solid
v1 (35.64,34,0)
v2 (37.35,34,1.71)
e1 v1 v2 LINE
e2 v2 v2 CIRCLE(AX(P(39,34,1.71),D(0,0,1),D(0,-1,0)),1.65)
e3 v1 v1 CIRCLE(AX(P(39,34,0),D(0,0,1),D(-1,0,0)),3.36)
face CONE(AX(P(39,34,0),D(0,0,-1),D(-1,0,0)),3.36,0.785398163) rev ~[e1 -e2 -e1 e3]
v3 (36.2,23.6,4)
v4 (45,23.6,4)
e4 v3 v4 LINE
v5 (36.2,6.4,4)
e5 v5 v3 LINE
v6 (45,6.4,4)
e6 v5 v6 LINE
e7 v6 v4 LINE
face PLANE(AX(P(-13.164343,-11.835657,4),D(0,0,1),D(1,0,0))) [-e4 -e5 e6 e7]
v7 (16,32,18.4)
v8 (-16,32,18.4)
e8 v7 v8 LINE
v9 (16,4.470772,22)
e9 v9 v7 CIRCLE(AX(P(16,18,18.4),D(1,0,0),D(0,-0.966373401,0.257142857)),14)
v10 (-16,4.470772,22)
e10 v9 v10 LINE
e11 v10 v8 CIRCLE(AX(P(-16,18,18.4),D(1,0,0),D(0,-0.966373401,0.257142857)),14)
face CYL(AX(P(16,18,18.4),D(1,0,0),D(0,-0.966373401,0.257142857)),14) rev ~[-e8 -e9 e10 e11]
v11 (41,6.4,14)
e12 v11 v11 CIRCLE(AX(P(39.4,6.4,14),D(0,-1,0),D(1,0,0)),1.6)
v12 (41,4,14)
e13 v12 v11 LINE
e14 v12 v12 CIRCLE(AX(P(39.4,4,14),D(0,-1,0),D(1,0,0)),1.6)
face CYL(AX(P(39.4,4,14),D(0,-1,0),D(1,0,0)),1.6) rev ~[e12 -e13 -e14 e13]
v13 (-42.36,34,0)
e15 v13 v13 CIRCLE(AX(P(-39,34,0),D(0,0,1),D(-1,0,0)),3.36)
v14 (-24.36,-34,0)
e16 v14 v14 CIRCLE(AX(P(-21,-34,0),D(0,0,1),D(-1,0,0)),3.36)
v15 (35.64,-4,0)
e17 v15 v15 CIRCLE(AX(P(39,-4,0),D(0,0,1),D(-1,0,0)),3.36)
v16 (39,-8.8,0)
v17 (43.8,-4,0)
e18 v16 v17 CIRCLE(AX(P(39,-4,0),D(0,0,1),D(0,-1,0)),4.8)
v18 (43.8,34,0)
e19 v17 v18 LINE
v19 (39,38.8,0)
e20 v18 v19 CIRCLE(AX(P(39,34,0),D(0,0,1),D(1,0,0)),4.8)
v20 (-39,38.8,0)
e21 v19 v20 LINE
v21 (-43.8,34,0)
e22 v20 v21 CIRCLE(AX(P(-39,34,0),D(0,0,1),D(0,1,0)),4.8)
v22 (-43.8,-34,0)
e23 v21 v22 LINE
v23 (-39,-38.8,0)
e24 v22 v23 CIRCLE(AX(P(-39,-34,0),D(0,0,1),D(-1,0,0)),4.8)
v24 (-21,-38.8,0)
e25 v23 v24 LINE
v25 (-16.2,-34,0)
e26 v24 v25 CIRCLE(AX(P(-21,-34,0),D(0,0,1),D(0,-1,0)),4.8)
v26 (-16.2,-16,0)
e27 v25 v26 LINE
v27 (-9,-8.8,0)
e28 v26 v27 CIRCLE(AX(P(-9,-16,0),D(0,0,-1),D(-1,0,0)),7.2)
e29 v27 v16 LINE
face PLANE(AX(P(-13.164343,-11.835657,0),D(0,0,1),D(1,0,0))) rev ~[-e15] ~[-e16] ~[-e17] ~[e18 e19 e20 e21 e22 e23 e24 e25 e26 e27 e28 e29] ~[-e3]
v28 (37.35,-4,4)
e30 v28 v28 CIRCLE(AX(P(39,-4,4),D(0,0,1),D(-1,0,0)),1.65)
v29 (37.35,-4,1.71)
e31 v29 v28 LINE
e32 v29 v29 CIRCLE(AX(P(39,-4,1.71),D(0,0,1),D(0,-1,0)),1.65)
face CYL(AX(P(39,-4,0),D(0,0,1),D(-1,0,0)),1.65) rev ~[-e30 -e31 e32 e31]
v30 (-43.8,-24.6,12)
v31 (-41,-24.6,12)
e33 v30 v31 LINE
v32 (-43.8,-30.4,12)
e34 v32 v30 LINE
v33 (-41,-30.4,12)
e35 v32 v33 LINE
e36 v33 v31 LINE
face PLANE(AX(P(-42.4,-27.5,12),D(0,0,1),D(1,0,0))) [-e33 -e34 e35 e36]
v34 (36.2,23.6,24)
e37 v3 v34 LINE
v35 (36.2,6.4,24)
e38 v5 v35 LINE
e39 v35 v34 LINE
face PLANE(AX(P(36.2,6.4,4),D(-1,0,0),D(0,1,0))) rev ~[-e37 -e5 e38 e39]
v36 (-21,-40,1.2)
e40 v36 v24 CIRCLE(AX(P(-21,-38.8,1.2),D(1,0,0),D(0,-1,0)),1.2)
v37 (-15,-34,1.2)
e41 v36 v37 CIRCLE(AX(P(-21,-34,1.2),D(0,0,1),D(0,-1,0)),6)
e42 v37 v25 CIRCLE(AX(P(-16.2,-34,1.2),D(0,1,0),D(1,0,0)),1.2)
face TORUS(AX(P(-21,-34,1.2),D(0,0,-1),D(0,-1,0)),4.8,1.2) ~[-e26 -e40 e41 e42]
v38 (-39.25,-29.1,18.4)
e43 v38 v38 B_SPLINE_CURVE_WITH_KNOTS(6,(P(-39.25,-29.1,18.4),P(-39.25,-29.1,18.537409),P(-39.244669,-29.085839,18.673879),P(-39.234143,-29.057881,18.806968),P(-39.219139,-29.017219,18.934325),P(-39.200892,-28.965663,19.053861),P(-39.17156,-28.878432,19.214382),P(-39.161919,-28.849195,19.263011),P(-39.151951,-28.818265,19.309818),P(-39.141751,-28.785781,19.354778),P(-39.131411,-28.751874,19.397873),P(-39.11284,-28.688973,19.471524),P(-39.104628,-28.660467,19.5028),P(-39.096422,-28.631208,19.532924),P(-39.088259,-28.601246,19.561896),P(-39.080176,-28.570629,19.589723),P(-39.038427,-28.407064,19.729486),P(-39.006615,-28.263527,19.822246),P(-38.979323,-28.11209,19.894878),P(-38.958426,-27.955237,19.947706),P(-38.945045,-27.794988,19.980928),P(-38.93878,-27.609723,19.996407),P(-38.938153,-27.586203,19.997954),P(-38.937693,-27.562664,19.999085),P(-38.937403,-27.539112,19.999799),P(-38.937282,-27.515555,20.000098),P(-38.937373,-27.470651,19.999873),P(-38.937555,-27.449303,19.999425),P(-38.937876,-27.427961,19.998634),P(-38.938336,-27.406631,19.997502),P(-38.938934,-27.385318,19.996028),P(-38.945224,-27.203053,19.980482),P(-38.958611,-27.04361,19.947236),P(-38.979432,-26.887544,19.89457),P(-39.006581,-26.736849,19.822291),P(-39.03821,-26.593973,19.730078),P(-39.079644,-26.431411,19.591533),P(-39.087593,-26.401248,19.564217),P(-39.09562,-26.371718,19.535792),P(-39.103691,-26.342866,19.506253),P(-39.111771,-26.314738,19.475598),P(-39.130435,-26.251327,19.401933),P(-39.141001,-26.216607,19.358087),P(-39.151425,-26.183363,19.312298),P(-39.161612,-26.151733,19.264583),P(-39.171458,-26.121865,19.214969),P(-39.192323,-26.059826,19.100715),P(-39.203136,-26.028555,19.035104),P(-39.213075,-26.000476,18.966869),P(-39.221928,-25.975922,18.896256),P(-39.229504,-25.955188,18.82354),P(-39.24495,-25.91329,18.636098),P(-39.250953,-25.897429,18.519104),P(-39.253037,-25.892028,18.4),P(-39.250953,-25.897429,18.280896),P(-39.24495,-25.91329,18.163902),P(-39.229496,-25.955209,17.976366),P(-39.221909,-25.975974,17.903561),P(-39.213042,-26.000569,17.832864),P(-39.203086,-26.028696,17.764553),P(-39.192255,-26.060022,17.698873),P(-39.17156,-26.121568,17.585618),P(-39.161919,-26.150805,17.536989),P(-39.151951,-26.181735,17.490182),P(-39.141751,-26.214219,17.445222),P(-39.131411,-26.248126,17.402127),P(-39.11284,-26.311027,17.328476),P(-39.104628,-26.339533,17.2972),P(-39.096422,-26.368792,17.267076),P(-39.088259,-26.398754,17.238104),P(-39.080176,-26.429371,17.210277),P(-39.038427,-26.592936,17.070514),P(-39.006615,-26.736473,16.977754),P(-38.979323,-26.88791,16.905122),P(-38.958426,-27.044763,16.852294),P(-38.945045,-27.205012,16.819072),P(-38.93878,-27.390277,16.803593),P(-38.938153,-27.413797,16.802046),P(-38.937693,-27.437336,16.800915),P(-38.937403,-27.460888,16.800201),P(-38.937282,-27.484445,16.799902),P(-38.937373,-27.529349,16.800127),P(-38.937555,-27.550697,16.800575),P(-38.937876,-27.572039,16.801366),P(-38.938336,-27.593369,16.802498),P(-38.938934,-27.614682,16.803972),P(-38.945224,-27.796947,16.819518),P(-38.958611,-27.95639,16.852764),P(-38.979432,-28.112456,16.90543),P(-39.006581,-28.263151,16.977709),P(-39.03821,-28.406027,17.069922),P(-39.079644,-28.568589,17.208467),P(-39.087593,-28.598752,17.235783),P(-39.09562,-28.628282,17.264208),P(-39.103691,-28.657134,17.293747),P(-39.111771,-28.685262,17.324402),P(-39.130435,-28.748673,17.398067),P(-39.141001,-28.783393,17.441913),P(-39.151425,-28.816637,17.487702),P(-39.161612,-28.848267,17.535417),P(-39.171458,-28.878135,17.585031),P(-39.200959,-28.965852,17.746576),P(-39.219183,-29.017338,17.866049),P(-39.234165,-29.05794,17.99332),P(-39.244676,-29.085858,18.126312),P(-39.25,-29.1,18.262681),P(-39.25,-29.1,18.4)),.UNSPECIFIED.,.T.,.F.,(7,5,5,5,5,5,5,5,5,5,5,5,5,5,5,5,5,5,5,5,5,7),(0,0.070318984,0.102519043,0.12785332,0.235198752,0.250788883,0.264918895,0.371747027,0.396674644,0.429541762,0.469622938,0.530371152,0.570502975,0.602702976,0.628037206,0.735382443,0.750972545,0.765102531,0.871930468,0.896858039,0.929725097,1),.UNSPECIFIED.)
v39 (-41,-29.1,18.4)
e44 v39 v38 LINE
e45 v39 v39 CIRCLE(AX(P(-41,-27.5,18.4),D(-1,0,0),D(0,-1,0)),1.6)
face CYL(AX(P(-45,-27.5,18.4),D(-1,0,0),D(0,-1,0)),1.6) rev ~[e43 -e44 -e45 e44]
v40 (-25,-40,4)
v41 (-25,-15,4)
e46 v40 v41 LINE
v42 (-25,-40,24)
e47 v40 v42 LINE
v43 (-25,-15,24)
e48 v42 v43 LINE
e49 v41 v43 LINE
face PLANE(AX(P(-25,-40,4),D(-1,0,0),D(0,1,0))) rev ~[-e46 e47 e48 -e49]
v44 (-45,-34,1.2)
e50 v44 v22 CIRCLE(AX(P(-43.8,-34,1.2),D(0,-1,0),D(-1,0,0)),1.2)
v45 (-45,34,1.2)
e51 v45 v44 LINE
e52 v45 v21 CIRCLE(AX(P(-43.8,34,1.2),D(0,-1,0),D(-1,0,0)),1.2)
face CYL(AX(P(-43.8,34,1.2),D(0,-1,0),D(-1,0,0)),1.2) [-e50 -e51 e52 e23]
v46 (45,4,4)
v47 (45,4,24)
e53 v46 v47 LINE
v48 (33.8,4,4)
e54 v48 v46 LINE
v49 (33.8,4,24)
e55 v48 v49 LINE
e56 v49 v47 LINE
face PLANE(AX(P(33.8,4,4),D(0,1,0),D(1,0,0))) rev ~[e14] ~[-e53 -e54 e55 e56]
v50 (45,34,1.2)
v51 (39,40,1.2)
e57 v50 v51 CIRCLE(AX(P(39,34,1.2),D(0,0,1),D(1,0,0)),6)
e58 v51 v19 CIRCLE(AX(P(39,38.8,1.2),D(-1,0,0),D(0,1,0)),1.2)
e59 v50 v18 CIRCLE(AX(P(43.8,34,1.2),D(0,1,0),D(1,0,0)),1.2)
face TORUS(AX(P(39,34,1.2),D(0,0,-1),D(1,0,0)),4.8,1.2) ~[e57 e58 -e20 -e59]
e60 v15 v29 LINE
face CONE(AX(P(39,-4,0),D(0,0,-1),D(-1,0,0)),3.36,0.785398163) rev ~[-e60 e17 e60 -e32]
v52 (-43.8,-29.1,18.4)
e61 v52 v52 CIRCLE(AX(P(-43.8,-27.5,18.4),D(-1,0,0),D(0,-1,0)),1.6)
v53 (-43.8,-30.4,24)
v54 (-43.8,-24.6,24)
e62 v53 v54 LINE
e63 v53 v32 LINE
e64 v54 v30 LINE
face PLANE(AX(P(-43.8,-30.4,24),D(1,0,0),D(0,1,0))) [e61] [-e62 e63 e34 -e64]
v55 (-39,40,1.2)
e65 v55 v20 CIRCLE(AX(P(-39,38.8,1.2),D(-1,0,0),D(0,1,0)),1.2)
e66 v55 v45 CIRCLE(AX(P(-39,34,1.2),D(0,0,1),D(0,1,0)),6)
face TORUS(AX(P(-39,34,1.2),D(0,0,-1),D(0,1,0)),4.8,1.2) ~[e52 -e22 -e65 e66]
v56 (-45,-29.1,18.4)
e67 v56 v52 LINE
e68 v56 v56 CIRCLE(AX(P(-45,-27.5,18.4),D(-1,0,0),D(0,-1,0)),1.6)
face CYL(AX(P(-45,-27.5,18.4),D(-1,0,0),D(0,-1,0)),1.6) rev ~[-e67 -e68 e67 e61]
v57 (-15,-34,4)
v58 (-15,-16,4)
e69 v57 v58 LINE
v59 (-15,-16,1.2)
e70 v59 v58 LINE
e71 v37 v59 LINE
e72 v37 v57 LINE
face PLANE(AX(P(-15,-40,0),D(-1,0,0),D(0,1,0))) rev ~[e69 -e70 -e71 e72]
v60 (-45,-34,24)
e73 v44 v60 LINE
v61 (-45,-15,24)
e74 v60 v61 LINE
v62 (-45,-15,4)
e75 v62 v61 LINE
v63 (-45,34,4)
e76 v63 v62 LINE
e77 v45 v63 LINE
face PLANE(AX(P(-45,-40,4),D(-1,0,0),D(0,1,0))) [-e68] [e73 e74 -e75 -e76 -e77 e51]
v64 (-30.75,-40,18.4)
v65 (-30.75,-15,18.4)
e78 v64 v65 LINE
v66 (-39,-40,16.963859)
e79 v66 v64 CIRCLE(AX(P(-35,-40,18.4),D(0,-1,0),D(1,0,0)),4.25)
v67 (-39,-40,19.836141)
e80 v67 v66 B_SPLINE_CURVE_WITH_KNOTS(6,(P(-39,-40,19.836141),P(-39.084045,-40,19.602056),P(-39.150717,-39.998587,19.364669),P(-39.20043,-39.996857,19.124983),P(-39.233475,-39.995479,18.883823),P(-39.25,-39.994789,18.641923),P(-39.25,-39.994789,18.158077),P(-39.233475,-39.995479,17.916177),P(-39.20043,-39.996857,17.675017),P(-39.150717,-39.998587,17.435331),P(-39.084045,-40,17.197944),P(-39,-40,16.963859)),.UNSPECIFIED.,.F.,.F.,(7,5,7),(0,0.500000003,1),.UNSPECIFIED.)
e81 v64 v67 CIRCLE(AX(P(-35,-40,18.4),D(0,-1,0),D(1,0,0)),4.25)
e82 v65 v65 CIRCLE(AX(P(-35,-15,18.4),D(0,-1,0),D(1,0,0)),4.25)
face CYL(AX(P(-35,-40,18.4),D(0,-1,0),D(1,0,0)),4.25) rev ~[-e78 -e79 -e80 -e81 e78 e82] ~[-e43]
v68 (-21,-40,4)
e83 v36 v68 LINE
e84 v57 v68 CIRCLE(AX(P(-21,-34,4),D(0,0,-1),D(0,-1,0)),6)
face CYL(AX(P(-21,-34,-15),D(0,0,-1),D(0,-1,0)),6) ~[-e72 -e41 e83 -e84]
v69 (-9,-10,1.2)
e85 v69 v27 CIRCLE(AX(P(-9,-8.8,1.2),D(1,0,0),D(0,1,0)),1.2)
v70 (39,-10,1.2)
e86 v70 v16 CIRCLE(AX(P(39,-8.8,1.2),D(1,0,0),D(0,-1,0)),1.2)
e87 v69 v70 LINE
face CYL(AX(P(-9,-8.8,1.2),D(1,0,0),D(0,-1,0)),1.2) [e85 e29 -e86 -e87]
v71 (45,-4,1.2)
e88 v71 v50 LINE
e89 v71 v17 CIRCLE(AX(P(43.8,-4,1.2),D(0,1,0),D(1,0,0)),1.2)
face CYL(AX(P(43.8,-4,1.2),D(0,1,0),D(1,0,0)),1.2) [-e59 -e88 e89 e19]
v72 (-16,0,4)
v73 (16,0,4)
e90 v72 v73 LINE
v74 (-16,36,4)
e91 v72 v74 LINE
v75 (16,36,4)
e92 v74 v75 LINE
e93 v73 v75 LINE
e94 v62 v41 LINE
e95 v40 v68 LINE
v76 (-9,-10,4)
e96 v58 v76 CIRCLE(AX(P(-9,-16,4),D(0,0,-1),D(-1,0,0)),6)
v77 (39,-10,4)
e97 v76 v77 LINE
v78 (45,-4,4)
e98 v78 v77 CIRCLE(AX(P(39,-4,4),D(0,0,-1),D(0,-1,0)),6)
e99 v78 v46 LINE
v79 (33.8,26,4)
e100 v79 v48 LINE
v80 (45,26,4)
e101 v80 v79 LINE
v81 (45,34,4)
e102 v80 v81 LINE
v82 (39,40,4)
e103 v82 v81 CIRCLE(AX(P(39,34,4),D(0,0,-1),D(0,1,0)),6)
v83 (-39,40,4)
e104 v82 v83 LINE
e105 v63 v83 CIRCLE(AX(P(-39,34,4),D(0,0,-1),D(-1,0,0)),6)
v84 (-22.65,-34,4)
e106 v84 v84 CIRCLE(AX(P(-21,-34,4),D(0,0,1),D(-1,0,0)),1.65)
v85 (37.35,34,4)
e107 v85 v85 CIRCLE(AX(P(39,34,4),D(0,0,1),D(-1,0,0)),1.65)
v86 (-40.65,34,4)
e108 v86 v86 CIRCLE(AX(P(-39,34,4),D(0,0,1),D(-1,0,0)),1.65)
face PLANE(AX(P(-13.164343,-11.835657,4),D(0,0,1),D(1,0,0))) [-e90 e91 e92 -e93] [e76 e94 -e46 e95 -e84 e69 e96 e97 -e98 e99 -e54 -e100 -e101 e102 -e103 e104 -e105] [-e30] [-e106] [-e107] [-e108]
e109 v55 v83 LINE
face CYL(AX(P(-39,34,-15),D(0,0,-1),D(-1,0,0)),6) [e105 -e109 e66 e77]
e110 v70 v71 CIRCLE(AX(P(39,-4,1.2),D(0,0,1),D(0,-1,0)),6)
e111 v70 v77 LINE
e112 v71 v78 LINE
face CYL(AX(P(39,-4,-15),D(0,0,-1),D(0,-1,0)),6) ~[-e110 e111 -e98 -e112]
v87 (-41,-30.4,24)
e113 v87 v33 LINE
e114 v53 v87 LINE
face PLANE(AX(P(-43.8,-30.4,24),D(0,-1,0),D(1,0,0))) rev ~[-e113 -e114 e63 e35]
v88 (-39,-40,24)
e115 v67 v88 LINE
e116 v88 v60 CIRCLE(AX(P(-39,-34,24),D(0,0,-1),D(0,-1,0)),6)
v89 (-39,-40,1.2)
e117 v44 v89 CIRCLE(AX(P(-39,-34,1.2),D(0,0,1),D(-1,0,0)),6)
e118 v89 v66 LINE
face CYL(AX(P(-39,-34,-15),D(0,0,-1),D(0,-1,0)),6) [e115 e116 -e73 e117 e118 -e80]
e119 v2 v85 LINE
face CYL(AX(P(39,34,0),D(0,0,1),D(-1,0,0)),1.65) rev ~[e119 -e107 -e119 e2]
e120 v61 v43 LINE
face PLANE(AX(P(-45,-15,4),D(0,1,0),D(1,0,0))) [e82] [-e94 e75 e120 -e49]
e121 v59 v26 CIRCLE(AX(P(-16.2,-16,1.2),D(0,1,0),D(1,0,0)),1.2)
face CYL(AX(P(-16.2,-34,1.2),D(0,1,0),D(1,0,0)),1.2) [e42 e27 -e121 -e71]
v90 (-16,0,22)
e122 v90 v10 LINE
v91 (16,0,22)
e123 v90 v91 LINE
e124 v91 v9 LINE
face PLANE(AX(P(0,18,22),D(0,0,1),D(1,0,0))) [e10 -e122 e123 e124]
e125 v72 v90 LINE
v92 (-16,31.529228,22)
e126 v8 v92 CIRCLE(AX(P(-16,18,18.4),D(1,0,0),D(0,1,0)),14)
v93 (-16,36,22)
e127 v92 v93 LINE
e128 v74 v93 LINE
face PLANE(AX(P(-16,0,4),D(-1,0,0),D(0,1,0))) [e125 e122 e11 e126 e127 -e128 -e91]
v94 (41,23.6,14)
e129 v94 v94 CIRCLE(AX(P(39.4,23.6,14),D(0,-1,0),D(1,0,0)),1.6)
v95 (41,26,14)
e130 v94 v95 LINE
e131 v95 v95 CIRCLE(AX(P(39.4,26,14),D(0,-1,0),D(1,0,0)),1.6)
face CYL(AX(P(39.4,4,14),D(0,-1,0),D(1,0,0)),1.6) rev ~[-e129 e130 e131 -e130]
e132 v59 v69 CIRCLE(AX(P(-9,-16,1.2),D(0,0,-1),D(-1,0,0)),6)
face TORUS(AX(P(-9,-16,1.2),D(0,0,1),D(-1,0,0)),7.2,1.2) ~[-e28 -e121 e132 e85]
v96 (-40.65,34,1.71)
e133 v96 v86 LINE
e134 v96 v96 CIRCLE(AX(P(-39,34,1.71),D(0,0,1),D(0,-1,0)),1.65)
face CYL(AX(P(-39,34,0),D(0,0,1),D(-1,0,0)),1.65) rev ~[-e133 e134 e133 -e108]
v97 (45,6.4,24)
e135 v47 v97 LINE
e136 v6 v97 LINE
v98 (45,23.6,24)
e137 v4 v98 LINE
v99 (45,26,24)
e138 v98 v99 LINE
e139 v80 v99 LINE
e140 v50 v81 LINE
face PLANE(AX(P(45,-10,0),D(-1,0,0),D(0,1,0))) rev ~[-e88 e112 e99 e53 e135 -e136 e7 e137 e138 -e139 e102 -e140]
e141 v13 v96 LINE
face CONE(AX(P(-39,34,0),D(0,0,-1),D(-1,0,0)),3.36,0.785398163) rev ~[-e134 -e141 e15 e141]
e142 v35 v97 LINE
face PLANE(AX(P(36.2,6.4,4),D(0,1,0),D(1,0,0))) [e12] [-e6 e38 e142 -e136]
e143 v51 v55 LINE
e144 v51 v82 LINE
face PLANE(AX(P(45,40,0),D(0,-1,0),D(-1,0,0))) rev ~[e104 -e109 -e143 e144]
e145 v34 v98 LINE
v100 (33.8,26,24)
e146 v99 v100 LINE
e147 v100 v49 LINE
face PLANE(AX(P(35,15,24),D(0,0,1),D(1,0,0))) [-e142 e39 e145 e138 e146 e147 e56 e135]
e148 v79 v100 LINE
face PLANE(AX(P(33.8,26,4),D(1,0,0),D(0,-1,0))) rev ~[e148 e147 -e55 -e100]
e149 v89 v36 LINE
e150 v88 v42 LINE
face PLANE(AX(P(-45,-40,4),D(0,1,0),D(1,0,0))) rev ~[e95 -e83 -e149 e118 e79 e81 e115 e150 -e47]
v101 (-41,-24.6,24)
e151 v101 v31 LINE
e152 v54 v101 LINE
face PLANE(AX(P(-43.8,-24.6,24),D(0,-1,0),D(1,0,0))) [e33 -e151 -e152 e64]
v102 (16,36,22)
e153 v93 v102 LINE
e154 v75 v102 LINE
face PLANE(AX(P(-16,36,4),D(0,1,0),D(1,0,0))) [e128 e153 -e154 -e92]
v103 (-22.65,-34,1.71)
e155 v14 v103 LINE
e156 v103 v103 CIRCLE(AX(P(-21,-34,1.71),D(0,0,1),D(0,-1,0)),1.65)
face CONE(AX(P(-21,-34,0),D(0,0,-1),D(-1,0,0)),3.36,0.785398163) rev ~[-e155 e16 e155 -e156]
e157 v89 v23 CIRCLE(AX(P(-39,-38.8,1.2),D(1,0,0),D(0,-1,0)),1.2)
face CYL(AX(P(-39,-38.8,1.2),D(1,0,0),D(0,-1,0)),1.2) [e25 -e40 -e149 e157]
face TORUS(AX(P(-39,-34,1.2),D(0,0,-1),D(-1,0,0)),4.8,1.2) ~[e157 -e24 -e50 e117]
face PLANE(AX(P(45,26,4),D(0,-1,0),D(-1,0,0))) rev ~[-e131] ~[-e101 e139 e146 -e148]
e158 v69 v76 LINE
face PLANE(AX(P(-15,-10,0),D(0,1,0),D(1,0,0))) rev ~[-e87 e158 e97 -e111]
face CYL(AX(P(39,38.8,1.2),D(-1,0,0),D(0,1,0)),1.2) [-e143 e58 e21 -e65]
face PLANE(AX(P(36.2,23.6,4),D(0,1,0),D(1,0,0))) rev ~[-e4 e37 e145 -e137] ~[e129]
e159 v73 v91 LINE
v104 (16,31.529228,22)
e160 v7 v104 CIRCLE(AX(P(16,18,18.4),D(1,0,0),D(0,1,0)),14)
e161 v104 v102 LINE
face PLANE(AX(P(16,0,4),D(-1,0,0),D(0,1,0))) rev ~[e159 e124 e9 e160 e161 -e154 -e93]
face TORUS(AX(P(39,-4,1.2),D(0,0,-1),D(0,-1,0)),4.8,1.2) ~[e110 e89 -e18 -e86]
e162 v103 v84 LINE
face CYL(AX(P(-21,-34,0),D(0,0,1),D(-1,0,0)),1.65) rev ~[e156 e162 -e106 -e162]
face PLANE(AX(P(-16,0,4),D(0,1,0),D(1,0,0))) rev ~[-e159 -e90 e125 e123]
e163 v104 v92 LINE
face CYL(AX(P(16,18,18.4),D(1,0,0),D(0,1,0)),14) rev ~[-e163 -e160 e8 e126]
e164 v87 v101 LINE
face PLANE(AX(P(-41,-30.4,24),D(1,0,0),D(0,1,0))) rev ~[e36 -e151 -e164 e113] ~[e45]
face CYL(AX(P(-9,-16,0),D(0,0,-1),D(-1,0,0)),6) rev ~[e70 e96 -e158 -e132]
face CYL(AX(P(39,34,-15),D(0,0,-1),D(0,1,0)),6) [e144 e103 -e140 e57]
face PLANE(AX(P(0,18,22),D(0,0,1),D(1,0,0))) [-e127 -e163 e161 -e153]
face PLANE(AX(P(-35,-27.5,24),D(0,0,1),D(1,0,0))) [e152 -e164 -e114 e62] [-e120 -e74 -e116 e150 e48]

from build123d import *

# Parameters (mm, degrees)
F1_DEPTH        = 4
F2_W            = 32
F2_H            = 36
F3_DEPTH        = 18
F5_DEPTH        = 32
F2_W_2          = 20
F2_H_2          = 25
F6_DEPTH        = 20
F7_R            = 4.25
F8_DEPTH        = 25
F9_W            = 2.8
F9_H            = 5.8
F10_DEPTH       = 12
F11_R           = 1.6
F12_DEPTH       = 10
F13_T1_DEPTH    = 4
F13_T3_DEPTH    = 34
F13_T5_DEPTH    = 54
F2_W_3          = 8.8
F2_H_3          = 2.4
F14_DEPTH       = 20
F15_R           = 1.6
F16_DEPTH       = 22
F18_D           = 3.3
F18_CSINK_D     = 6.72
F18_CSINK_ANGLE = 90
F19_R           = 1.2


# Not quite as in the source:
# - a fillet or chamfer that OpenCascade refuses, or shapes differently, is made with other operations: its cross-section is extruded or revolved along the edge and cut away or added


with BuildPart() as f1:
    # F0 (on Top) → F1 (new body)
    with BuildSketch(Plane.XY):
        Polygon((-45, -40), (-15, -40), (-15, -10), (45, -10), (45, 40), (-45, 40), align=None)
    extrude(amount=F1_DEPTH)

    # F2 (on face) → F3 (join)
    with BuildSketch(Plane.XY.offset(4)):
        with Locations((0, 18)):
            Rectangle(F2_W, F2_H)
    extrude(amount=F3_DEPTH)

    # F4 (on face) → F5 (cut, through all)
    with BuildSketch(Plane.YZ.offset(16)):
        with BuildLine():
            ThreePointArc((4.4707723798, 22), (16.1846745035, 4.5181920003), (32, 18.4))
            ThreePointArc((32, 18.4), (31.8818079997, 20.2153254965), (31.5292276202, 22))
            Line((31.5292276202, 22), (4.4707723798, 22))
        make_face()
    extrude(amount=-F5_DEPTH, mode=Mode.SUBTRACT)

    # F2 (on face) → F6 (join)
    with BuildSketch(Plane.XY.offset(4)):
        with Locations((-35, -27.5)):
            Rectangle(F2_W_2, F2_H_2)
    extrude(amount=F6_DEPTH)

    # F7 (on face) → F8 (cut, through all)
    with BuildSketch(Plane.XZ.offset(40)):
        with Locations((-35, 18.4)):
            Circle(F7_R)
    extrude(amount=-F8_DEPTH, mode=Mode.SUBTRACT)

    # F9 (on face) → F10 (cut)
    with BuildSketch(Plane.XY.offset(24)):
        with Locations((-42.4, -27.5)):
            Rectangle(F9_W, F9_H)
    extrude(amount=-F10_DEPTH, mode=Mode.SUBTRACT)

    # F11 (on face) → F12 (cut)
    with BuildSketch(Plane(origin=(-45, 0, 0), x_dir=(0, -1, 0), z_dir=(-1, 0, 0))):
        with Locations((27.5, 18.4)):
            Circle(F11_R)
    extrude(amount=-F12_DEPTH, mode=Mode.SUBTRACT)

    # F13: fillet of radius 6 on 6 edges, made by hand

    # F13_s2 → F13_t1 (join)
    with BuildSketch(Plane.XY):
        with BuildLine():
            ThreePointArc((-15, -16), (-13.2426406871, -11.7573593129), (-9, -10))
            Line((-9, -10), (-15, -10))
            Line((-15, -10), (-15, -16))
        make_face()
    extrude(amount=F13_T1_DEPTH)

    # F13_s4 → F13_t3 (cut)
    with BuildSketch(Plane.XY.offset(-15)):
        with BuildLine():
            ThreePointArc((-21, -40), (-16.7573593129, -38.2426406871), (-15, -34))
            Line((-15, -34), (-15, -40))
            Line((-15, -40), (-21, -40))
        make_face()
        with BuildLine():
            ThreePointArc((39, -10), (43.2426406871, -8.2426406871), (45, -4))
            Line((45, -4), (45, -10))
            Line((45, -10), (39, -10))
        make_face()
        with BuildLine():
            ThreePointArc((39, 40), (43.2426406871, 38.2426406871), (45, 34))
            Line((45, 34), (45, 40))
            Line((45, 40), (39, 40))
        make_face()
        with BuildLine():
            ThreePointArc((-45, 34), (-43.2426406871, 38.2426406871), (-39, 40))
            Line((-39, 40), (-45, 40))
            Line((-45, 40), (-45, 34))
        make_face()
    extrude(amount=F13_T3_DEPTH, mode=Mode.SUBTRACT)

    # F13_s6 → F13_t5 (cut)
    with BuildSketch(Plane.XY.offset(-15)):
        with BuildLine():
            ThreePointArc((-39, -40), (-43.2426406871, -38.2426406871), (-45, -34))
            Line((-45, -34), (-45, -40))
            Line((-45, -40), (-39, -40))
        make_face()
    extrude(amount=F13_T5_DEPTH, mode=Mode.SUBTRACT)

    # F2 (on face) → F14 (join)
    with BuildSketch(Plane.XY.offset(4)):
        Polygon((36.2, 23.6), (36.2, 26), (33.8, 26), (33.8, 4), (36.2, 4), (36.2, 6.4), align=None)
        with Locations((40.6, 5.2)):
            Rectangle(F2_W_3, F2_H_3)
        with Locations((40.6, 24.8)):
            Rectangle(F2_W_3, F2_H_3)
    extrude(amount=F14_DEPTH)

    # F15 (on face) → F16 (cut, through all)
    with BuildSketch(Plane.XZ.offset(-4)):
        with Locations((39.4, 14)):
            Circle(F15_R)
    extrude(amount=-F16_DEPTH, mode=Mode.SUBTRACT)

    # F18 (through all)
    with Locations(Plane(origin=(0, 0, 0), x_dir=(1, 0, 0), z_dir=(0, 0, -1))):
        with Locations((-21, 34), (39, 4), (39, -34), (-39, -34)):
            CounterSinkHole(F18_D / 2, F18_CSINK_D / 2, counter_sink_angle=F18_CSINK_ANGLE)

    # F19
    f19_edges = [f1.edges().sort_by_distance(p)[0] for p in [
        (0, 40, 0),
        (-43.242641, 38.242641, 0),
        (-30, -40, 0),
        (-43.242641, -38.242641, 0),
        (-45, 0, 0),
        (43.242641, 38.242641, 0),
        (45, 15, 0),
        (-16.757359, -38.242641, 0),
        (43.242641, -8.242641, 0),
        (-15, -25, 0),
        (15, -10, 0),
        (-13.242641, -11.757359, 0),
    ]]
    fillet(f19_edges, radius=F19_R)


solid = f1.part
